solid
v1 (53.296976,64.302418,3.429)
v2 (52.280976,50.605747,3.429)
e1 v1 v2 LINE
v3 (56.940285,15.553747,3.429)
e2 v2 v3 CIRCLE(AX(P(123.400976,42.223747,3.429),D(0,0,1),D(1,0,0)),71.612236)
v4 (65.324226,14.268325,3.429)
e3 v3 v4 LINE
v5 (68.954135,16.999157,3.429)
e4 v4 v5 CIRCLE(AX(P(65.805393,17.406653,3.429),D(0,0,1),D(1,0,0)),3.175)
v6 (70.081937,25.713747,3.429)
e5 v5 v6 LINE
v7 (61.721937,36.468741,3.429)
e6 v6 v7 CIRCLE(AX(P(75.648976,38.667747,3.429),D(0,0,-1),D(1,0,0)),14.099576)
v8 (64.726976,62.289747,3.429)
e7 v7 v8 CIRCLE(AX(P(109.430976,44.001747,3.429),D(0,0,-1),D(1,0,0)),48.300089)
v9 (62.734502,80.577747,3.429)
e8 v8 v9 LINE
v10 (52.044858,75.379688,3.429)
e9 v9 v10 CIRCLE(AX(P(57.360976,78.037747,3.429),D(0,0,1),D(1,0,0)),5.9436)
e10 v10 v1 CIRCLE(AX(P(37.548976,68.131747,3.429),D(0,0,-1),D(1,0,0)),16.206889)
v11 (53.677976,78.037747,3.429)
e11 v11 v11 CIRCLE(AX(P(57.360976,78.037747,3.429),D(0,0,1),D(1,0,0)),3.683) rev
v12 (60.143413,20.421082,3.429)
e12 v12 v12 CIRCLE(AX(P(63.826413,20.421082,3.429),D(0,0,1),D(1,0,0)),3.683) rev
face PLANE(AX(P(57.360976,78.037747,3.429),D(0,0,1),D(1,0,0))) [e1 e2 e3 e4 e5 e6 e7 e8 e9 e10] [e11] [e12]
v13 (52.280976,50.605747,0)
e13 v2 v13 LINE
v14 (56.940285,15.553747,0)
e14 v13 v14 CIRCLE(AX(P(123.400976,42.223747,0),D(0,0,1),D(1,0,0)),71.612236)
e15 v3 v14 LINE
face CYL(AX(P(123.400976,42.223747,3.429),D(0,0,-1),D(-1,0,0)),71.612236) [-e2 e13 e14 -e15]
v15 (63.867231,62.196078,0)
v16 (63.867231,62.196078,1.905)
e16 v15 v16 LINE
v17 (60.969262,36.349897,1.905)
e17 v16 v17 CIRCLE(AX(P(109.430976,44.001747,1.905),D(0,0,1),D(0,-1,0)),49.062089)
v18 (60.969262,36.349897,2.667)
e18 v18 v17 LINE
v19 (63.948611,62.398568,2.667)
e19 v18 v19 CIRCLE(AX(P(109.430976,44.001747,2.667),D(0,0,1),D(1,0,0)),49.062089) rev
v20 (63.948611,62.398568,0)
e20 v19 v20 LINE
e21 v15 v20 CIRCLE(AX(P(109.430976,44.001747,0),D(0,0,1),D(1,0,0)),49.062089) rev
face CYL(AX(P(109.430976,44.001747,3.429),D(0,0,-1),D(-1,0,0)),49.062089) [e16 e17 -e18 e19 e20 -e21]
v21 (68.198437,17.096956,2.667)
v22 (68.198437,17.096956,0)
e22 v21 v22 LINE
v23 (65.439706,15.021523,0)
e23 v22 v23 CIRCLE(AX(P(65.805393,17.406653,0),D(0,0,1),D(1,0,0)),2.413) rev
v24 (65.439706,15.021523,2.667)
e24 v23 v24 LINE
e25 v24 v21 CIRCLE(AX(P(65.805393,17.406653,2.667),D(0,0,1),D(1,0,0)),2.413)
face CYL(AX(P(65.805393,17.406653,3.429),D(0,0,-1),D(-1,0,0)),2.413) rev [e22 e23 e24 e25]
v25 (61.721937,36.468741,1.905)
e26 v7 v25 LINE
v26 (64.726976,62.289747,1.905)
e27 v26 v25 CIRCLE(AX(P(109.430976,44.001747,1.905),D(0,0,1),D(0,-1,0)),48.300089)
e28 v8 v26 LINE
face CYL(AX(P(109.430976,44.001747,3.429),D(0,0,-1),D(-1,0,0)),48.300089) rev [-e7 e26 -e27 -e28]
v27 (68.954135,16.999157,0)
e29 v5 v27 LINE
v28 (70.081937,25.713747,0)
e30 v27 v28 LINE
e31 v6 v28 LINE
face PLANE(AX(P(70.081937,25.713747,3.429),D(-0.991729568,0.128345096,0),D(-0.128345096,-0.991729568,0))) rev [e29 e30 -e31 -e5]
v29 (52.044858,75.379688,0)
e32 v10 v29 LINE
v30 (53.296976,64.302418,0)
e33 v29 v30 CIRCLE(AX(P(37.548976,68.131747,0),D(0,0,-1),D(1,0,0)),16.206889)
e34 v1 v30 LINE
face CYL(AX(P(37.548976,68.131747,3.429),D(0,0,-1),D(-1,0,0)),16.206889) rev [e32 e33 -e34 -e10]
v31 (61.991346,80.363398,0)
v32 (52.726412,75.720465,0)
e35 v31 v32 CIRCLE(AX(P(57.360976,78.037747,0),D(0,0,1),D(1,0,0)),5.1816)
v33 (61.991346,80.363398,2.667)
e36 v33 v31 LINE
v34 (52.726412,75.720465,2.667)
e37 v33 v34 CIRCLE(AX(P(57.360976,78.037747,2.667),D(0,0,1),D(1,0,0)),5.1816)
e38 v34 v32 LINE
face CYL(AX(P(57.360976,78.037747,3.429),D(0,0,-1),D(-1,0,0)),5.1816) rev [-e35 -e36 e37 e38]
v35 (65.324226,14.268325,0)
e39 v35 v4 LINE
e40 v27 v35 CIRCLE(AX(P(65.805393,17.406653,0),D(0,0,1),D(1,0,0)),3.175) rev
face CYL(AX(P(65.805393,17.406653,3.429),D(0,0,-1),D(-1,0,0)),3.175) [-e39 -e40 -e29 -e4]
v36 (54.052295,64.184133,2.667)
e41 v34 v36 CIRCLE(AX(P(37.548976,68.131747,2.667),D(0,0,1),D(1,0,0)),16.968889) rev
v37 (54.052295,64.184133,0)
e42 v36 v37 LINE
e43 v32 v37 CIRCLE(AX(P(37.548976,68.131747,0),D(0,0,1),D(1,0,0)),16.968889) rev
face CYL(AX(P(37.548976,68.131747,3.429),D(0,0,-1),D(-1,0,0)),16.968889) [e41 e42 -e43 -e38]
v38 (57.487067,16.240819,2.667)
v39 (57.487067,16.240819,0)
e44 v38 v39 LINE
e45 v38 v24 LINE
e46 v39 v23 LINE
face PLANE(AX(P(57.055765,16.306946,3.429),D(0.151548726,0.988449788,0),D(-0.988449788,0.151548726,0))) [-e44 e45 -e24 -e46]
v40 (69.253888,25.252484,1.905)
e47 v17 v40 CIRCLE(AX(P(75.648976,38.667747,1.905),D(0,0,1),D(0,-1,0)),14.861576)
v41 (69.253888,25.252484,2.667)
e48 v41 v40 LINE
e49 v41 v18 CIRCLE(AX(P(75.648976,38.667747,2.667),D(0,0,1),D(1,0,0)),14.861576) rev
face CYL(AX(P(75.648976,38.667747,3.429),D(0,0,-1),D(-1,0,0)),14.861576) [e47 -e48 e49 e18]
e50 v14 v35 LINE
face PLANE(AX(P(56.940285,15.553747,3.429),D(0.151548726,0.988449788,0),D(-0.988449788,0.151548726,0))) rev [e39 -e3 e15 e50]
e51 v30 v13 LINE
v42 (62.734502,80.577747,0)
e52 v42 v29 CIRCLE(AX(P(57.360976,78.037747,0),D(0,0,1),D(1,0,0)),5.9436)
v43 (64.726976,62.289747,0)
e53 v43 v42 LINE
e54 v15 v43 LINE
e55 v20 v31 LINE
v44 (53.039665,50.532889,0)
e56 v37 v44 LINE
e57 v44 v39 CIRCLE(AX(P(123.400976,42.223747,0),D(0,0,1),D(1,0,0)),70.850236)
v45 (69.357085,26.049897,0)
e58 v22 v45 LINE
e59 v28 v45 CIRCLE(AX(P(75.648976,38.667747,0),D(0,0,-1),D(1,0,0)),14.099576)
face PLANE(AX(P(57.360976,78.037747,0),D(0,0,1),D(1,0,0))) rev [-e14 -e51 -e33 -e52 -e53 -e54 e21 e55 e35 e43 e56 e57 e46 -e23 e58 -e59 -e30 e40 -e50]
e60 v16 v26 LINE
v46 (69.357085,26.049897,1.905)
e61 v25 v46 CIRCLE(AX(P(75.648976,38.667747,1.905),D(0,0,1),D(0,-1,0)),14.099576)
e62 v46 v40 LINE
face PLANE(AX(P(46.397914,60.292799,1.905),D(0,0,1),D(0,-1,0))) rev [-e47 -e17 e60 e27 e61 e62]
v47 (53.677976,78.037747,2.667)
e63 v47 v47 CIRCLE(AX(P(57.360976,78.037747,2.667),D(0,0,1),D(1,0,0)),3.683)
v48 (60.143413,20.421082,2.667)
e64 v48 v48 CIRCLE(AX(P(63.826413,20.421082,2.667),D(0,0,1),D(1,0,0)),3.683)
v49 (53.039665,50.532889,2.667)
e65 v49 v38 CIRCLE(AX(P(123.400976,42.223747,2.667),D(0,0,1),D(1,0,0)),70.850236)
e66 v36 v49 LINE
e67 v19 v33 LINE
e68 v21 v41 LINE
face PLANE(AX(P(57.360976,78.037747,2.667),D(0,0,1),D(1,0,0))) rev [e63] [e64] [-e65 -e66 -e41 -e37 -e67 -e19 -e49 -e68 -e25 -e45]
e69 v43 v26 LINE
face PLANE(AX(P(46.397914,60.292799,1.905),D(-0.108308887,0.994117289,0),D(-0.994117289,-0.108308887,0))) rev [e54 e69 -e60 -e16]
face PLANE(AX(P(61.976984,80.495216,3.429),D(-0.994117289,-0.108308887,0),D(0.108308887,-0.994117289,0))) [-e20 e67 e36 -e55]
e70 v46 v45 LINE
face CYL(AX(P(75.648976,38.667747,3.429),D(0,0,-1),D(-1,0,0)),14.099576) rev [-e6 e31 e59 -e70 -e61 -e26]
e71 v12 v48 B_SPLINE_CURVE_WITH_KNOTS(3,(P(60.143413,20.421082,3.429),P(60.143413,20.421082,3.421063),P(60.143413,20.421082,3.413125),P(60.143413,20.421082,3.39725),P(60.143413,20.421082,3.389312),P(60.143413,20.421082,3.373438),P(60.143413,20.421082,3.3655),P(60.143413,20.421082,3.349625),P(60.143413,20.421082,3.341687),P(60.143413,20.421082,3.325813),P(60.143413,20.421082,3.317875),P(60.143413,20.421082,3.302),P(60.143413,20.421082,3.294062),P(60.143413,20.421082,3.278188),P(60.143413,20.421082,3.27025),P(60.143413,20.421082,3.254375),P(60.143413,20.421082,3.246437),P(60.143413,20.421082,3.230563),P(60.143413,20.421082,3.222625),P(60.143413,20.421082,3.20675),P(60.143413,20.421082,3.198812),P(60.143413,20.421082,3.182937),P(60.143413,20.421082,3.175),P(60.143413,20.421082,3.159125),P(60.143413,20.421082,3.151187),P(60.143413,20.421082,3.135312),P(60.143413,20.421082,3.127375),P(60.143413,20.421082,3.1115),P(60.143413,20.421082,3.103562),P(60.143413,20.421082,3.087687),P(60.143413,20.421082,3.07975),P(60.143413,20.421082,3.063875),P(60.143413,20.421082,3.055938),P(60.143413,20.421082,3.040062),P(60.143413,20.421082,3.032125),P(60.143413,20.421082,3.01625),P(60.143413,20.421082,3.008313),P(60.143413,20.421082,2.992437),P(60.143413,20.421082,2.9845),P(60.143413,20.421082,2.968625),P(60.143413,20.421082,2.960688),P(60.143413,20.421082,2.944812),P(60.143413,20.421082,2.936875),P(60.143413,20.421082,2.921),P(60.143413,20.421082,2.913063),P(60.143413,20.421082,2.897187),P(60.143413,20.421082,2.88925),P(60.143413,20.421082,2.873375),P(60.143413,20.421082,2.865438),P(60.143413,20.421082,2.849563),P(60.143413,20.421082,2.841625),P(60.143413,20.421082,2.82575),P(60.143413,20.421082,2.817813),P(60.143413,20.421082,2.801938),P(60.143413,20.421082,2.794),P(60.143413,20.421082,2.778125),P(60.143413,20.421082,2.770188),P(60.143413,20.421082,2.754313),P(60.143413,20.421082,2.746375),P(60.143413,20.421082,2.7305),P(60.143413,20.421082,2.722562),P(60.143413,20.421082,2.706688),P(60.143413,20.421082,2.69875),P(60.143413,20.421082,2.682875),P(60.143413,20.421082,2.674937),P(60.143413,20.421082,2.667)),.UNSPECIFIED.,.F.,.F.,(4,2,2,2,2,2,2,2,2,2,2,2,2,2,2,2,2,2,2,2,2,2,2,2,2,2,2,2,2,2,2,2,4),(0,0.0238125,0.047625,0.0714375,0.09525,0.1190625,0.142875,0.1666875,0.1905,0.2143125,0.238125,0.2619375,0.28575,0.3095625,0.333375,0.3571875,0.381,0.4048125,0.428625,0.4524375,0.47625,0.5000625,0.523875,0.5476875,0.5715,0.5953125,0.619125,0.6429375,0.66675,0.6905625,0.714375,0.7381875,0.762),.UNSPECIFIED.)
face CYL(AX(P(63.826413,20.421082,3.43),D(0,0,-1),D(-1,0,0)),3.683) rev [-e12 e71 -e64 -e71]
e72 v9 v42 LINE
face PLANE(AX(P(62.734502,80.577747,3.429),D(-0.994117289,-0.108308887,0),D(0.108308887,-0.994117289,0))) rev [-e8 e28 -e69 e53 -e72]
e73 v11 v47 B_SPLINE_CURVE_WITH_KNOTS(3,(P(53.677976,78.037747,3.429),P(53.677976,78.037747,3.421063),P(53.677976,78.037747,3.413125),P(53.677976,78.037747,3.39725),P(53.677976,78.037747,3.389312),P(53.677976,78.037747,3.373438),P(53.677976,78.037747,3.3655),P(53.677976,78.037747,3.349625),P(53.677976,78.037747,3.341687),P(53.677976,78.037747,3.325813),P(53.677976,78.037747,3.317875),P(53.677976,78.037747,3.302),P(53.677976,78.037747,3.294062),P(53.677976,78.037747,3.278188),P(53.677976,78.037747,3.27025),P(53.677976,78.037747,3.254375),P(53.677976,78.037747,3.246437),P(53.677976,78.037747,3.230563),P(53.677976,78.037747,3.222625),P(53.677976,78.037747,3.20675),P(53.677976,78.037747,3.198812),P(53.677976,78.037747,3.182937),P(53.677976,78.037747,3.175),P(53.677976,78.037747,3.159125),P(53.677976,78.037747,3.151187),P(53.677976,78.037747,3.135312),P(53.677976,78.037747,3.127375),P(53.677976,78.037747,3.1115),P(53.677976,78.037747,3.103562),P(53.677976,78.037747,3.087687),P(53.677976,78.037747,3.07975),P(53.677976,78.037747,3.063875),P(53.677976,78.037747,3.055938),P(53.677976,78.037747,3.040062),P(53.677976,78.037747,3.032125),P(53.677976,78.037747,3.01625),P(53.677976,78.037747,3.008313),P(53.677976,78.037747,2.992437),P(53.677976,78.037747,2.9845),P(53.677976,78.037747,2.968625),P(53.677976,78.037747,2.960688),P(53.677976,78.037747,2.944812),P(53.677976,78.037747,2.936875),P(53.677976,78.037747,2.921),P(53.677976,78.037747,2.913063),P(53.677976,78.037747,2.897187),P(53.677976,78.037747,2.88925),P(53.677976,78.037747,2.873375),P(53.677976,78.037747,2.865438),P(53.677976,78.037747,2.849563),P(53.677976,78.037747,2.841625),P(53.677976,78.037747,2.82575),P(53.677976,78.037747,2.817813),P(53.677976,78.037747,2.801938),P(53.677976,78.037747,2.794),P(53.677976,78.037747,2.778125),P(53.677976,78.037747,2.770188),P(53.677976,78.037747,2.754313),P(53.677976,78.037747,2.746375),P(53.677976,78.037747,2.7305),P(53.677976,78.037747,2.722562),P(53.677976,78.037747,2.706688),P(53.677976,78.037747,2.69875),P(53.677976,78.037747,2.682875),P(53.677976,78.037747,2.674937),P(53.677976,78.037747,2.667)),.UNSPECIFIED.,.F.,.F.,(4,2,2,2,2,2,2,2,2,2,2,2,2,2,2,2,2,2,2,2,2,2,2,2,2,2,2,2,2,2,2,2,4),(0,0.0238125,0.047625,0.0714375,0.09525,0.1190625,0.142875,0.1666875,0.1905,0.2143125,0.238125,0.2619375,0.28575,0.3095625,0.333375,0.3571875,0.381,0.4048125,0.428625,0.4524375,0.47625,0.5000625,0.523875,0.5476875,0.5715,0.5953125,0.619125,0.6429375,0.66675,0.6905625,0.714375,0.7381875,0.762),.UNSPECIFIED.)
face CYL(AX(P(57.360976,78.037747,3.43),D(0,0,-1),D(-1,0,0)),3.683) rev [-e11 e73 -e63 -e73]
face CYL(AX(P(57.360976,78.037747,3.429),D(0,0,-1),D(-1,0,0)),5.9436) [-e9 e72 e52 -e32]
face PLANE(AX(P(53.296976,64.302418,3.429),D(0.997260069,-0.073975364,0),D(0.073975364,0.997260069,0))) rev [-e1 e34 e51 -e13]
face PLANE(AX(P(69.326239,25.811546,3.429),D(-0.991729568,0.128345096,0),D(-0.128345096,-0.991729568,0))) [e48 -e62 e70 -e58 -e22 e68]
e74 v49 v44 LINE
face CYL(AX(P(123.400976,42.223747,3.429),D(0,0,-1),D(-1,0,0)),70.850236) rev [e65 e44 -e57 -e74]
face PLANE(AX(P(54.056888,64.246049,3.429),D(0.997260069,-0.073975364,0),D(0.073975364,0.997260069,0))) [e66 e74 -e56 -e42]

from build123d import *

# Parameters (mm, degrees)
BOSS_EXTRUDE1_DEPTH     = 3.429
FILLET1_R               = 3.175
SKETCH2_R               = 2.921
CUT_EXTRUDE1_DEPTH      = 110.435380853
SHELL2_OUTLINE_R        = 3.683
SHELL2_DEPTH            = 2.667
CUT_EXTRUDE2_REACH      = 111.435
SKETCH3_R               = 3.683
CUT_EXTRUDE3_REACH      = 80.749
SKETCH4_W               = 1.905
SKETCH4_H               = 36.940823868
CUT_EXTRUDE4_DEPTH      = 110.435380853
CUT_EXTRUDE4_DEPTH_BACK = 1.778
CUT_EXTRUDE5_DEPTH      = 0.127


# Read off the part's stored shape, not the designer's step: Shell2
with BuildPart() as part:
    # Sketch1 → Boss-Extrude1 (new body)
    with BuildSketch(Plane.XY):
        with BuildLine():
            Line((62.7345016, 80.577747087), (64.726975666, 62.289747087))
            ThreePointArc((64.726975666, 62.289747087), (61.454694837, 49.585208184), (61.721936912, 36.468740968))
            ThreePointArc((61.721936912, 36.468740968), (64.516939118, 30.014666788), (70.081936923, 25.713747087))
            Line((70.081936923, 25.713747087), (68.536975666, 13.775747087))
            Line((68.536975666, 13.775747087), (56.940284848, 15.553747087))
            ThreePointArc((56.940284848, 15.553747087), (52.413143628, 32.787644792), (52.280975666, 50.605747087))
            Line((52.280975666, 50.605747087), (53.296975666, 64.302418224))
            ThreePointArc((53.296975666, 64.302418224), (53.653310061, 69.952097941), (52.044858214, 75.37968836))
            ThreePointArc((52.044858214, 75.37968836), (54.7617878, 83.382894736), (62.7345016, 80.577747087))
        make_face()
    extrude(amount=BOSS_EXTRUDE1_DEPTH)

    # Fillet1
    fillet1_edges = [part.edges().sort_by_distance(p)[0] for p in [
        (68.536975666, 13.775747087, 1.7145),
    ]]
    fillet(fillet1_edges, radius=FILLET1_R)

    # Sketch2 → Cut-Extrude1 (cut, through all)
    with BuildSketch(Plane.XY.offset(3.429)):
        with Locations((57.360975666, 78.037747087)):
            Circle(SKETCH2_R)
        with Locations((63.826413409, 20.421081821)):
            Circle(SKETCH2_R)
    extrude(amount=-CUT_EXTRUDE1_DEPTH, mode=Mode.SUBTRACT)

    # Shell2 outline → Shell2 (cut)
    with BuildSketch(Plane.XY):
        with BuildLine():
            ThreePointArc((61.991345759, 80.363397827), (55.039508366, 82.670215989), (52.726411733, 75.72046512))
            ThreePointArc((52.726411733, 75.72046512), (54.406890906, 70.069245661), (54.052294982, 64.184132803))
            Line((54.052294982, 64.184132803), (53.039664753, 50.532889471))
            ThreePointArc((53.039664753, 50.532889471), (53.139176681, 33.111364087), (57.487066991, 16.240818773))
            Line((57.487066991, 16.240818773), (65.439706148, 15.021523317))
            ThreePointArc((65.439706148, 15.021523317), (67.256047768, 15.478396864), (68.198436672, 17.096955938))
            Line((68.198436672, 17.096955938), (69.253887741, 25.252483979))
            ThreePointArc((69.253887741, 25.252483979), (63.739946861, 29.77722029), (60.969261533, 36.349897487))
            ThreePointArc((60.969261533, 36.349897487), (60.686685648, 49.576935849), (63.948610548, 62.398567528))
            Line((63.948610548, 62.398567528), (61.991345759, 80.363397827))
        make_face()
        with Locations((63.826413409, 20.421081821)):
            Circle(SHELL2_OUTLINE_R, mode=Mode.SUBTRACT)
        with Locations((57.360975666, 78.037747087)):
            Circle(SHELL2_OUTLINE_R, mode=Mode.SUBTRACT)
    extrude(amount=SHELL2_DEPTH, mode=Mode.SUBTRACT)

    # Sketch3 → Cut-Extrude2 (cut, up to next)
    with BuildSketch(Plane(origin=(0, 0, 0), x_dir=(-1, 0, 0), z_dir=(0, 0, -1)), mode=Mode.PRIVATE) as cut_extrude2_sk1:
        with Locations((-57.360975666, 78.037747087)):
            Circle(SKETCH3_R)
    cut_extrude2_tool1 = extrude(cut_extrude2_sk1.sketch, amount=-CUT_EXTRUDE2_REACH, mode=Mode.PRIVATE) & part.part
    # Sketch3 → Cut-Extrude2 (cut, up to next)
    with BuildSketch(Plane(origin=(0, 0, 0), x_dir=(-1, 0, 0), z_dir=(0, 0, -1)), mode=Mode.PRIVATE) as cut_extrude2_sk2:
        with Locations((-63.826413409, 20.421081821)):
            Circle(SKETCH3_R)
    cut_extrude2_tool2 = extrude(cut_extrude2_sk2.sketch, amount=-CUT_EXTRUDE2_REACH, mode=Mode.PRIVATE) & part.part
    add(cut_extrude2_tool1.solids().sort_by_distance((57.360976, 78.037747, 0))[0], mode=Mode.SUBTRACT)
    add(cut_extrude2_tool2.solids().sort_by_distance((63.826413, 20.421082, 0))[0], mode=Mode.SUBTRACT)

    # Sketch4 → Cut-Extrude3 (cut, up to next)
    with BuildSketch(Plane(origin=(70.674520745, 7.699975379, 0), x_dir=(0, 0, -1), z_dir=(0.9941172894005426, 0.10830888659255154, 0)), mode=Mode.PRIVATE) as cut_extrude3_sk1:
        with Locations((-0.9525, 36.44239593)):
            Rectangle(SKETCH4_W, SKETCH4_H)
    cut_extrude3_tool1 = extrude(cut_extrude3_sk1.sketch, amount=-CUT_EXTRUDE3_REACH, mode=Mode.PRIVATE) & part.part
    add(cut_extrude3_tool1.solids().sort_by_distance((66.727485, 43.927991, 0.9525))[0], mode=Mode.SUBTRACT)

    # Sketch5 → Cut-Extrude4 (cut, two sides: drawn at the far end of the back side and taken through both)
    with BuildSketch(Plane(origin=(0, 0, 0), x_dir=(-1, 0, 0), z_dir=(0, 0, -1)).offset(-CUT_EXTRUDE4_DEPTH_BACK)):
        with BuildLine():
            Line((-69.357085228, 26.049896593), (-69.253887741, 25.252483979))
            ThreePointArc((-69.253887741, 25.252483979), (-68.949955482, 25.401641313), (-68.649499804, 25.557683339))
            Line((-68.649499804, 25.557683339), (-68.727995169, 25.566235394))
            Line((-68.727995169, 25.566235394), (-68.633052886, 26.437666796))
            ThreePointArc((-68.633052886, 26.437666796), (-68.992244892, 26.238508503), (-69.357085228, 26.049896593))
        make_face()
    extrude(amount=CUT_EXTRUDE4_DEPTH + CUT_EXTRUDE4_DEPTH_BACK, mode=Mode.SUBTRACT)

    # Sketch6 → Cut-Extrude5 (cut)
    with BuildSketch(Plane(origin=(0, 0, 1.778), x_dir=(-1, 0, 0), z_dir=(0, 0, -1))):
        with BuildLine():
            Line((-69.357085228, 26.049896593), (-69.253887741, 25.252483979))
            ThreePointArc((-69.253887741, 25.252483979), (-68.949955482, 25.401641313), (-68.649499804, 25.557683339))
            Line((-68.649499804, 25.557683339), (-68.727995169, 25.566235394))
            Line((-68.727995169, 25.566235394), (-68.633052886, 26.437666796))
            ThreePointArc((-68.633052886, 26.437666796), (-68.992244892, 26.238508503), (-69.357085228, 26.049896593))
        make_face()
    extrude(amount=-CUT_EXTRUDE5_DEPTH, mode=Mode.SUBTRACT)


solid = part.part
